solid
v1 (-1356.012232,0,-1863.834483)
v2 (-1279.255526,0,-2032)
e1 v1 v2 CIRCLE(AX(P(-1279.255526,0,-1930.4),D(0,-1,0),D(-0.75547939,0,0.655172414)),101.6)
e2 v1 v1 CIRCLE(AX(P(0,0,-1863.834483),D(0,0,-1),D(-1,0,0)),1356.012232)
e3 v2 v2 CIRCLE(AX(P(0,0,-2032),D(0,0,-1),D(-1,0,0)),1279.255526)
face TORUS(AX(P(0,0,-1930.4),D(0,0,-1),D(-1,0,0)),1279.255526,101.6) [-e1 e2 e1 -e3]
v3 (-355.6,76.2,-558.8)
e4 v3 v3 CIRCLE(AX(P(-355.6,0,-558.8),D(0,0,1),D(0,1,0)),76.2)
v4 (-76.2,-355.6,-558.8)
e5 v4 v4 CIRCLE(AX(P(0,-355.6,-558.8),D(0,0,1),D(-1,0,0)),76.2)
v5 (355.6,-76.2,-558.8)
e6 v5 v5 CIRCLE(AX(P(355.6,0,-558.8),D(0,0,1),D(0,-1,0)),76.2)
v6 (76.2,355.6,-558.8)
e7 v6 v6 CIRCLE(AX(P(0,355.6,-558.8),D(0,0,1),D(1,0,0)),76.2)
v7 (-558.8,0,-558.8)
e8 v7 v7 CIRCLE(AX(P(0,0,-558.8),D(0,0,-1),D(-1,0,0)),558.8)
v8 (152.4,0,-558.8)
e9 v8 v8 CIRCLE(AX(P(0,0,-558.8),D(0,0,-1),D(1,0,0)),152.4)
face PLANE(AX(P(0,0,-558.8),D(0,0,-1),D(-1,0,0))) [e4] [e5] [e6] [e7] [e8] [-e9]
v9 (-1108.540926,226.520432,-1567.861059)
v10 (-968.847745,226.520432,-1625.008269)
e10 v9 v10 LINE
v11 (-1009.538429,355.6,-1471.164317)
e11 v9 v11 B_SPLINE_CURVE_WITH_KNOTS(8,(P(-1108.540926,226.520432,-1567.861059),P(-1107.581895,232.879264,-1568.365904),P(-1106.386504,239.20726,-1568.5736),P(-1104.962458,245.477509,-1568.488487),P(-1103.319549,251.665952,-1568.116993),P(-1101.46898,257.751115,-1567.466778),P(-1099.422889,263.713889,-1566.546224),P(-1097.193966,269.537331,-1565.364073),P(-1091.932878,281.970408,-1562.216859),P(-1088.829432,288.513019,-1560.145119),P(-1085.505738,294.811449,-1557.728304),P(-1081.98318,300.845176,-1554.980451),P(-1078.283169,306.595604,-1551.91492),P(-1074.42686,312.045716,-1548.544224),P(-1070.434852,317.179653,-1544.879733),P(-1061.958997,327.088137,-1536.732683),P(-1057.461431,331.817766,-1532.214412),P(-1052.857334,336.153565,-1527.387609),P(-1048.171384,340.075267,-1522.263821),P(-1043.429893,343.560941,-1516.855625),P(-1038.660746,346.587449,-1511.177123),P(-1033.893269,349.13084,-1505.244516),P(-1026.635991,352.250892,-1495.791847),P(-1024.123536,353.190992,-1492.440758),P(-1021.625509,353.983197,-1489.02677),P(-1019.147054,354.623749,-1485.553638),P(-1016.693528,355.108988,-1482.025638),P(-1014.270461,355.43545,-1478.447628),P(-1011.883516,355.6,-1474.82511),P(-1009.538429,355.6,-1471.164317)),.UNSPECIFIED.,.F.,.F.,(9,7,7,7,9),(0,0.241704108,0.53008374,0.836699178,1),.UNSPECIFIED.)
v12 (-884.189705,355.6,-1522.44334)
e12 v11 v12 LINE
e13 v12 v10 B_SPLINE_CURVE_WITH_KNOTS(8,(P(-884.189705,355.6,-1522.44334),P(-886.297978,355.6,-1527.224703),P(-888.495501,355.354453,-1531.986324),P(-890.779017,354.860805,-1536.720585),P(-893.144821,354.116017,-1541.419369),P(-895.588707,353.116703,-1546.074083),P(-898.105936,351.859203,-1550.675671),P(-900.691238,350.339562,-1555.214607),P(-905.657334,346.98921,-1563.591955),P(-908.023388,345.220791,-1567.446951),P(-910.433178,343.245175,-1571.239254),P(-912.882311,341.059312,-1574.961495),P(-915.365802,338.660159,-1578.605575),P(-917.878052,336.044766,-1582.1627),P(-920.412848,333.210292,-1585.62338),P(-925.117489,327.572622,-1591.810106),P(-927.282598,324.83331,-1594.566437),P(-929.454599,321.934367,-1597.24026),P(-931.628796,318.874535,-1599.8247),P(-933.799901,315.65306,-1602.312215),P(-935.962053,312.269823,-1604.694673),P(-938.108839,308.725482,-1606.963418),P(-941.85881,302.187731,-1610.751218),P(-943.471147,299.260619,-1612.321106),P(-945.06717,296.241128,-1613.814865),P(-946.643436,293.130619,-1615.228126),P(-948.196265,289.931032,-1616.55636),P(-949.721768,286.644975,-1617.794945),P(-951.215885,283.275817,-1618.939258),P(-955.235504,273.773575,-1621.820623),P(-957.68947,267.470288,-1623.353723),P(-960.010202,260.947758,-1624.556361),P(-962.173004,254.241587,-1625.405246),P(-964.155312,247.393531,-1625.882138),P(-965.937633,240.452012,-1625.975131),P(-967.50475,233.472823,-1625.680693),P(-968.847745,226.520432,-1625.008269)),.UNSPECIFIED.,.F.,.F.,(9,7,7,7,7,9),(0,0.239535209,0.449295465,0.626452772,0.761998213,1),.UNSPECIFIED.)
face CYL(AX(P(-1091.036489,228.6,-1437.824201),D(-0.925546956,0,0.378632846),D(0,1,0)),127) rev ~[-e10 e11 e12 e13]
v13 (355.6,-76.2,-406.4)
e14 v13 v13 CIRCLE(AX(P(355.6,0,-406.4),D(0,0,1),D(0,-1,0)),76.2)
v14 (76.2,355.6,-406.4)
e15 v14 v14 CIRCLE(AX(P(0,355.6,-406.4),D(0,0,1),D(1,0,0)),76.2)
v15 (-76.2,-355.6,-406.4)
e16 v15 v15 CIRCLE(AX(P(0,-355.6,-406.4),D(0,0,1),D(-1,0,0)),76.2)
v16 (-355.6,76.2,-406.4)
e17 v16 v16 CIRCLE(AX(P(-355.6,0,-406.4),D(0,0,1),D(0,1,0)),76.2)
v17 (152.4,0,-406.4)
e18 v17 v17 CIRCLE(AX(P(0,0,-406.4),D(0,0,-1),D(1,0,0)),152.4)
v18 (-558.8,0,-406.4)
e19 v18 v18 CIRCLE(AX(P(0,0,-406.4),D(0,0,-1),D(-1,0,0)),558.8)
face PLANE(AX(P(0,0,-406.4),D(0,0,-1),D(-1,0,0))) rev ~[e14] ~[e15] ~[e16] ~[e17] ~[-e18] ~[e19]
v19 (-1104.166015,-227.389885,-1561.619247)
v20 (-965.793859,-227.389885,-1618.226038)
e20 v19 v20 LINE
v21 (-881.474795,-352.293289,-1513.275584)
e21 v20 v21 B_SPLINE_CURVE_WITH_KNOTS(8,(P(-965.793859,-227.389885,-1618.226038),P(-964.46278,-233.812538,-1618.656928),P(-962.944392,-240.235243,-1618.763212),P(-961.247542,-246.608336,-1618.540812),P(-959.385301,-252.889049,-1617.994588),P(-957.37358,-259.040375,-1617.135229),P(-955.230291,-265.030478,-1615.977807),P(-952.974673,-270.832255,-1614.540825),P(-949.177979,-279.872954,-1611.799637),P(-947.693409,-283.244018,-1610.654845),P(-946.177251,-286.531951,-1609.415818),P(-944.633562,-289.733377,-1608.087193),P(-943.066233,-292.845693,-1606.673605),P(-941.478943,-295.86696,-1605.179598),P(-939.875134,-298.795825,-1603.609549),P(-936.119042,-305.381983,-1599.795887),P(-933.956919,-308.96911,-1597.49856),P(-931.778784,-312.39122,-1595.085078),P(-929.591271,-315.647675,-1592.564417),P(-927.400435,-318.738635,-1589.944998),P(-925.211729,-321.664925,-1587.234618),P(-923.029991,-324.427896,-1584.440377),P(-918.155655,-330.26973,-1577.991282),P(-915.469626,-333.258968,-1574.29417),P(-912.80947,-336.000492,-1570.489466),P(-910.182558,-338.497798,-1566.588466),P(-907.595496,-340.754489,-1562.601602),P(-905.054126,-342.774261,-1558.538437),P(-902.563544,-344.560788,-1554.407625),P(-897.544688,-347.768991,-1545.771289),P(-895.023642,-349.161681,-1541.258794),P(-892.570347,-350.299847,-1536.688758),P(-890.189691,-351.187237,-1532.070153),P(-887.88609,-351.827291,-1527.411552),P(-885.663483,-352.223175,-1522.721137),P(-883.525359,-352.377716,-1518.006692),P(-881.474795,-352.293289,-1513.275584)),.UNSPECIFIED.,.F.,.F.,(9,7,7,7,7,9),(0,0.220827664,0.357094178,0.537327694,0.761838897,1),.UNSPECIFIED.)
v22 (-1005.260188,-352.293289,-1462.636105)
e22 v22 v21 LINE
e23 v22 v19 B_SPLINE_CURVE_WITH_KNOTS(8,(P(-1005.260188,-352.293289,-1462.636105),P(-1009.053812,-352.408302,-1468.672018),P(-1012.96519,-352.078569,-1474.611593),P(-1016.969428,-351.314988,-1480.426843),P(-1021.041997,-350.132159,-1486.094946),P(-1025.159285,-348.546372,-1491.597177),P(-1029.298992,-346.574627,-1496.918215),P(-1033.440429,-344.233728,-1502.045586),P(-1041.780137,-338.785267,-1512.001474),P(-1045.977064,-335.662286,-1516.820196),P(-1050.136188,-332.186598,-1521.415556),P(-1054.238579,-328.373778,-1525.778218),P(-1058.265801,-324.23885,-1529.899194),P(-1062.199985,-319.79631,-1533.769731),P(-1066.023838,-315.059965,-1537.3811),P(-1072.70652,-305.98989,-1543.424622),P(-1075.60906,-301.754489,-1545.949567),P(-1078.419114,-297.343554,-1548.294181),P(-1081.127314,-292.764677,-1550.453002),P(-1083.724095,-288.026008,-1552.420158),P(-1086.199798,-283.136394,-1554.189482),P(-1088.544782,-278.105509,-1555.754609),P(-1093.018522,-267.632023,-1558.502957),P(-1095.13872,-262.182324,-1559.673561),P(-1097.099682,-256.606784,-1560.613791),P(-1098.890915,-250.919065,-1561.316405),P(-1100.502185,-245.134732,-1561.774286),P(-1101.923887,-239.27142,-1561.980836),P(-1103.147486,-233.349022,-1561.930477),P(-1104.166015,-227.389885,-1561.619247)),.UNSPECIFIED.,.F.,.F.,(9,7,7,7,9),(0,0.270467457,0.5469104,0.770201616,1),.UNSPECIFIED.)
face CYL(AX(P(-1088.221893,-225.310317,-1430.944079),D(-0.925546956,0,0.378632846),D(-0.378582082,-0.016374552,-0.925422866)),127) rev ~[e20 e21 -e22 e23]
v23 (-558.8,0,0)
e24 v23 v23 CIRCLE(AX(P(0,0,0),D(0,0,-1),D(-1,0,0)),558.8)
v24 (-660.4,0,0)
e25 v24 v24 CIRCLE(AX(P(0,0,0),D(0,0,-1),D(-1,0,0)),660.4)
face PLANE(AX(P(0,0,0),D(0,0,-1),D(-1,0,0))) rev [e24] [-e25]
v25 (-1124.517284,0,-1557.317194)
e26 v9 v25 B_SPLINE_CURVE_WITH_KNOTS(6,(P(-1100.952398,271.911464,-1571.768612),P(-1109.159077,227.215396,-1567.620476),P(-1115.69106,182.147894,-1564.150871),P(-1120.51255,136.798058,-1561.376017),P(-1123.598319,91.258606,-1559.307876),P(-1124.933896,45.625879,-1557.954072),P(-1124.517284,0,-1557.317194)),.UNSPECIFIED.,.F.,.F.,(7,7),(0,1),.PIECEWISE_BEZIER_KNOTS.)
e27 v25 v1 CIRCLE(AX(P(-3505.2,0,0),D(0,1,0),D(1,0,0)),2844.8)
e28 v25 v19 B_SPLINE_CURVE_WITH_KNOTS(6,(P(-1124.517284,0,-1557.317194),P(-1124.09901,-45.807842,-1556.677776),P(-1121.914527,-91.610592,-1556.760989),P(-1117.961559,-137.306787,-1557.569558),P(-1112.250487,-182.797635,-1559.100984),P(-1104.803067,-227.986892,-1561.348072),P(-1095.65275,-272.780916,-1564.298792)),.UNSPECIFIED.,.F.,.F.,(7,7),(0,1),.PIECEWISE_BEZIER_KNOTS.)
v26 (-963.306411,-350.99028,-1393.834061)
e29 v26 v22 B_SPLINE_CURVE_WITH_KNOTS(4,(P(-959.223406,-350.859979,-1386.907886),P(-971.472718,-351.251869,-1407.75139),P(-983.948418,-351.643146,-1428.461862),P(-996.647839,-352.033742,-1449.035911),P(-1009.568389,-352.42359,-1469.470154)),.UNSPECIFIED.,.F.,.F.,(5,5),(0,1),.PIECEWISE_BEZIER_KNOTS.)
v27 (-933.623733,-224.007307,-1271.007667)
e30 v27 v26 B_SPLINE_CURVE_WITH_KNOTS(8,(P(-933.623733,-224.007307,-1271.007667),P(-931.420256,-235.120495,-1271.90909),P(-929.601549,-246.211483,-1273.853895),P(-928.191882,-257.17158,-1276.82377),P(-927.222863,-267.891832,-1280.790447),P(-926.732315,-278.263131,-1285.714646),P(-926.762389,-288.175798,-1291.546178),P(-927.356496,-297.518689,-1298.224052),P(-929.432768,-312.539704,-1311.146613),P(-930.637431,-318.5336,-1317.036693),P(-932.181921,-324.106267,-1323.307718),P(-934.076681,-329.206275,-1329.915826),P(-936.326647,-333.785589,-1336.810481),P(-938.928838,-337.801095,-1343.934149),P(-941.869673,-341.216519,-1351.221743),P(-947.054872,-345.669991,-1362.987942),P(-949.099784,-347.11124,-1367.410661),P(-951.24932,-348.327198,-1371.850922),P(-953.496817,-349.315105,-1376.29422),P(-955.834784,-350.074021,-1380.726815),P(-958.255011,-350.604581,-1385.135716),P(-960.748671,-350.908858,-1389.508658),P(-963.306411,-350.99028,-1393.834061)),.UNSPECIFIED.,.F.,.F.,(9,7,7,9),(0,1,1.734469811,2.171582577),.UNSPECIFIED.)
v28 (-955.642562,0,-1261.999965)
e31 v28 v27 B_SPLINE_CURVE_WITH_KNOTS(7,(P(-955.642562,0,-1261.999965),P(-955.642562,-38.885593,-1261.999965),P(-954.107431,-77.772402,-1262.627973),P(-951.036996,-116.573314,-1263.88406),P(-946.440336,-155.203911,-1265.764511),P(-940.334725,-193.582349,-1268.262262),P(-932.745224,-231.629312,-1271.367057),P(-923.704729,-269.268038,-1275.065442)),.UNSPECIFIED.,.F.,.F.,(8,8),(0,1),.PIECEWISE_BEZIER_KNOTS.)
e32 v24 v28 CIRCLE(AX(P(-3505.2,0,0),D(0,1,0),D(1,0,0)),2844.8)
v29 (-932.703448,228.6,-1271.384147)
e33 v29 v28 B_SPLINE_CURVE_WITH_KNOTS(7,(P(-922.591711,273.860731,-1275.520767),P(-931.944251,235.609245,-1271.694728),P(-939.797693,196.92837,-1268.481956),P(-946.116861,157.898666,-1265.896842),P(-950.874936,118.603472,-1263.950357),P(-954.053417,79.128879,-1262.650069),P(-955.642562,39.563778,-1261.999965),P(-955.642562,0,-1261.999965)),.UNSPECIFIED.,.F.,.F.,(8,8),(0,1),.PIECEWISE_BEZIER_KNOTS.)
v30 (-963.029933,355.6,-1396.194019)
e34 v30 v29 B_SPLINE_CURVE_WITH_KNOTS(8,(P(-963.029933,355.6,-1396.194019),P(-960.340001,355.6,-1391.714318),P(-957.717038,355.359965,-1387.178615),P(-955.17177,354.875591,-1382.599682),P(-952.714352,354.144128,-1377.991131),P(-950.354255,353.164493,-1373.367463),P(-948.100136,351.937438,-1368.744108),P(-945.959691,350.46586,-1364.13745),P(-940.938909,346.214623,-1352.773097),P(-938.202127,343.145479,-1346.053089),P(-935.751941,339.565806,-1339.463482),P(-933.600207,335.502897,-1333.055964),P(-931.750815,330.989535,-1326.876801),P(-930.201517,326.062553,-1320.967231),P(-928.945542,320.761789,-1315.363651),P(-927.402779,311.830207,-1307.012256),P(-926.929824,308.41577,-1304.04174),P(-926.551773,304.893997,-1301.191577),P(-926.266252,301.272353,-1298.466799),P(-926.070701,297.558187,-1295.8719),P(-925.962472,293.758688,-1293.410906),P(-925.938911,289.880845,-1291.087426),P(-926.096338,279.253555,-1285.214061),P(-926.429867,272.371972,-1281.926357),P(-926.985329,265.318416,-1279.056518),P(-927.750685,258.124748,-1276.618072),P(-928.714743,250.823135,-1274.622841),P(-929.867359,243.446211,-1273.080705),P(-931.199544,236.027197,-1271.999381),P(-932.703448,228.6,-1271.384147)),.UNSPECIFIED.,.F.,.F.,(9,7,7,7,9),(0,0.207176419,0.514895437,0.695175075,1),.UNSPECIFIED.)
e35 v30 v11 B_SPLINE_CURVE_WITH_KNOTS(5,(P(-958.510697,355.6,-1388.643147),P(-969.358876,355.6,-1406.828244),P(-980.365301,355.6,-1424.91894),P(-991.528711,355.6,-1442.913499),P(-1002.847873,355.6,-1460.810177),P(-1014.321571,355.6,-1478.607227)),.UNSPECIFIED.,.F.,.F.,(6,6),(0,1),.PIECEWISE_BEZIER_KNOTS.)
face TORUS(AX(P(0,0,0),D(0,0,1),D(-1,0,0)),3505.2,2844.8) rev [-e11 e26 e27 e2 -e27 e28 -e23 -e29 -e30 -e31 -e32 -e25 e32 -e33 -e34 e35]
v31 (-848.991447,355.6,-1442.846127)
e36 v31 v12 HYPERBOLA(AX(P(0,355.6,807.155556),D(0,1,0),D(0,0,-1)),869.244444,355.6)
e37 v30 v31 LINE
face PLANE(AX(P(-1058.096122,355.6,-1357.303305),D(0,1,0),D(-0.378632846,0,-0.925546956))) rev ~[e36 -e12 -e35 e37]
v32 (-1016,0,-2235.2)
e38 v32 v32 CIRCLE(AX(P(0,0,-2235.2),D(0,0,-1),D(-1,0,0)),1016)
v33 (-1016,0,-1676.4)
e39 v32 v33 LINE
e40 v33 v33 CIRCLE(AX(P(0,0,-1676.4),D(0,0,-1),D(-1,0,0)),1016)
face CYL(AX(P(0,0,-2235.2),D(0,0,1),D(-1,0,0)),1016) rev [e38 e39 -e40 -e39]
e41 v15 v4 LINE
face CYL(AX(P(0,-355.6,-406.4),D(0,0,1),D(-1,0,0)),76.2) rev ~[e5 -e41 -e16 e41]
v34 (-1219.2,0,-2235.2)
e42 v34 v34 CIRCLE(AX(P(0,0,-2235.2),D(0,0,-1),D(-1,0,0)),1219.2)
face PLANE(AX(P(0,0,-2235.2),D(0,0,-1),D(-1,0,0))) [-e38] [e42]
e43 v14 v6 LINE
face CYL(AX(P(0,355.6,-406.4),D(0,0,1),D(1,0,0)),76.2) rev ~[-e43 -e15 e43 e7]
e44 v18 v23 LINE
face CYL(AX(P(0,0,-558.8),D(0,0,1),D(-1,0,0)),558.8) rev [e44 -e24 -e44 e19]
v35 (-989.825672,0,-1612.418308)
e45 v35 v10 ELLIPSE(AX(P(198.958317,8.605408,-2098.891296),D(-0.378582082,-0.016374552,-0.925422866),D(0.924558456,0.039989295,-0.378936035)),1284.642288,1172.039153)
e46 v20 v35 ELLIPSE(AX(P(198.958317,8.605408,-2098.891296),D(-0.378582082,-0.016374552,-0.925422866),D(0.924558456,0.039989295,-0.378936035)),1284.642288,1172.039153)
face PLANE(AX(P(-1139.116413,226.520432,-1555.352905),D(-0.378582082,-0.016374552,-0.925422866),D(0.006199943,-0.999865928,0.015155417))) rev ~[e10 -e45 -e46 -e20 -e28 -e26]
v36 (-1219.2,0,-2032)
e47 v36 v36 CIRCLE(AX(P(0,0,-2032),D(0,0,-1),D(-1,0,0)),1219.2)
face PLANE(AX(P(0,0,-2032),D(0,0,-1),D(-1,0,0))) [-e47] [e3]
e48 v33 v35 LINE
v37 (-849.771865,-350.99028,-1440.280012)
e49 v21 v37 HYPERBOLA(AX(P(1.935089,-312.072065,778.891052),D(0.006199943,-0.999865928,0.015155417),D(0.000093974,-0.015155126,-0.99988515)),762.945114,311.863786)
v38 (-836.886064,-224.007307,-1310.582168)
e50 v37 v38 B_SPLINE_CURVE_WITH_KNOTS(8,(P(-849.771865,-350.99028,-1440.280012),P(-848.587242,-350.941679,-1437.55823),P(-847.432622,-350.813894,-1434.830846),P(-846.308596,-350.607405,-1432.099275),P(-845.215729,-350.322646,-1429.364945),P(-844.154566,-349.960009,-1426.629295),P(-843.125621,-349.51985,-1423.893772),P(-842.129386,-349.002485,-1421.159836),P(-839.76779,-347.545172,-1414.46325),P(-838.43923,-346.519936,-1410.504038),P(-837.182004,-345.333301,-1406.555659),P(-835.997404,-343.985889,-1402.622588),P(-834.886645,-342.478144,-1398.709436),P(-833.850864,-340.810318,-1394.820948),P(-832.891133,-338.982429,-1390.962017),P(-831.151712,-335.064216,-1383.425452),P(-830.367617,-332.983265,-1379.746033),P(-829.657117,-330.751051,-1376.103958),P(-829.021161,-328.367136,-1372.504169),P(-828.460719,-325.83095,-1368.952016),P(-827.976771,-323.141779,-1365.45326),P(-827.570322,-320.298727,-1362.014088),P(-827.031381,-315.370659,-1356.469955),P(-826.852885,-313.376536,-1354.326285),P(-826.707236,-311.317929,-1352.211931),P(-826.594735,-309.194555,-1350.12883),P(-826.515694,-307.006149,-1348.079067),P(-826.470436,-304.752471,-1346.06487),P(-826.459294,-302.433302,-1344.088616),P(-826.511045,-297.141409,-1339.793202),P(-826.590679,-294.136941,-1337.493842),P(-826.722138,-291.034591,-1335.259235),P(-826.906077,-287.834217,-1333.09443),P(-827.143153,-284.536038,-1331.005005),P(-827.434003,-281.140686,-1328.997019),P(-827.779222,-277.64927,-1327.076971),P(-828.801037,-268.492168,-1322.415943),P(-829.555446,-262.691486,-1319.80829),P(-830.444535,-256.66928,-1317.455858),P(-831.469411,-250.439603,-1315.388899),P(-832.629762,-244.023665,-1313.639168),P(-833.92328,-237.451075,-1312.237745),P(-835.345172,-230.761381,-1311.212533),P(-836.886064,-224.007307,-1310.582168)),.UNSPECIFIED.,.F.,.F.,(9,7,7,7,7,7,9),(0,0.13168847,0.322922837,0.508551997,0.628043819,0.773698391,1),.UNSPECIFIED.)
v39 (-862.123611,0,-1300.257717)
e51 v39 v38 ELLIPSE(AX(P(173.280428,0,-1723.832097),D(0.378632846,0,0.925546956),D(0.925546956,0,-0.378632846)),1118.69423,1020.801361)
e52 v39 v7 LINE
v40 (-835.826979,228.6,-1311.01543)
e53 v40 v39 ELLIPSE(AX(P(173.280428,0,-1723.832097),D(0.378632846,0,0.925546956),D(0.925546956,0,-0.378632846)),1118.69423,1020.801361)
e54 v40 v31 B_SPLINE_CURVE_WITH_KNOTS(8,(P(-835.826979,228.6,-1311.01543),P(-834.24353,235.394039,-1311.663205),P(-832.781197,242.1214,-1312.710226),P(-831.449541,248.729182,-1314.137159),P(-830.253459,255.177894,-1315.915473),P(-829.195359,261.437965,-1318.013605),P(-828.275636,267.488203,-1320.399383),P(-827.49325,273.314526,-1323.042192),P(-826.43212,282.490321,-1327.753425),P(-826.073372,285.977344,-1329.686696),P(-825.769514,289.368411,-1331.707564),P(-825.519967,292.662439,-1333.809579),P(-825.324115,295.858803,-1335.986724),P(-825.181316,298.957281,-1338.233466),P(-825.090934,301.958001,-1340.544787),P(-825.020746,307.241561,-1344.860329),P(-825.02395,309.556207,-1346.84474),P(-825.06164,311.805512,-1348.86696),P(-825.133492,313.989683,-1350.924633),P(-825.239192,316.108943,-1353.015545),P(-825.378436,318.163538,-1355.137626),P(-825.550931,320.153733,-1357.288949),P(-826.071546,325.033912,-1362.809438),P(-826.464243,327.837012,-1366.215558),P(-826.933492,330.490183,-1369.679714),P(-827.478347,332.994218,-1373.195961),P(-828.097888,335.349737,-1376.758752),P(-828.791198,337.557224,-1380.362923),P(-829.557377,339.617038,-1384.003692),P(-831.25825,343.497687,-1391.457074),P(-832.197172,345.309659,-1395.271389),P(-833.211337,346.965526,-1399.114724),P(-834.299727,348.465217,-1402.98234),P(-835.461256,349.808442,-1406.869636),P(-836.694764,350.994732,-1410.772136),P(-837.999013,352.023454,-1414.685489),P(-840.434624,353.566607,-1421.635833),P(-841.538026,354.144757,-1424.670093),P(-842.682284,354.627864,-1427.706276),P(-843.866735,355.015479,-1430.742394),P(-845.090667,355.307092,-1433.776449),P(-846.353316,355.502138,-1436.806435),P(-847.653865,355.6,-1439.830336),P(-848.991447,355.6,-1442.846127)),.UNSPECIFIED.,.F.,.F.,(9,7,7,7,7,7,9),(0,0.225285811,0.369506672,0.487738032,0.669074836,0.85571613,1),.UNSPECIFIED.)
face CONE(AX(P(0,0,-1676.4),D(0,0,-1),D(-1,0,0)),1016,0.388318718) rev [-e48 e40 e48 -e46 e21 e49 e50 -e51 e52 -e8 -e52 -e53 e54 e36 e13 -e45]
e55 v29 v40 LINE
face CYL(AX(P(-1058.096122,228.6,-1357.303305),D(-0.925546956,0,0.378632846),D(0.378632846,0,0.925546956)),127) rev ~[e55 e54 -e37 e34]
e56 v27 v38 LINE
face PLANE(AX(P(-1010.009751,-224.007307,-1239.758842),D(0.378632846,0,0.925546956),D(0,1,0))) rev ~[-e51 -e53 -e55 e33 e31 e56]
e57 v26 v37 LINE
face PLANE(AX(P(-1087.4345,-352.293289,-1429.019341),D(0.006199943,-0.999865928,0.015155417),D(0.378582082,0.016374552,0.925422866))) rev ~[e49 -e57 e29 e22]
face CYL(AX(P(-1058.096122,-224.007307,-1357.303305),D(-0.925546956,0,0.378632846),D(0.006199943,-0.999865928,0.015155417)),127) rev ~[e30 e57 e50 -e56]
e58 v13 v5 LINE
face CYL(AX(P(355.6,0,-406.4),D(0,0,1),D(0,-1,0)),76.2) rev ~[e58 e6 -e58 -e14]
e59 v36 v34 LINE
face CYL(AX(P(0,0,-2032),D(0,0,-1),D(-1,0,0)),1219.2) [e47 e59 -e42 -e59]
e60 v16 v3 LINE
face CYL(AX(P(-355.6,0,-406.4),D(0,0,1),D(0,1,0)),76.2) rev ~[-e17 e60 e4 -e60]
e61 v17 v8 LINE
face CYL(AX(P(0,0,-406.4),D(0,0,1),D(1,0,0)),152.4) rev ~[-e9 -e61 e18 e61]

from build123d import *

# Parameters (mm, degrees)
F0_W            = 558.8
F0_H            = 152.4
F2_R            = 152.4
F2_R_2          = 76.2
F3_DEPTH        = 152.4
F3_COPIES_COUNT = 4
F6_DEPTH        = 254


# Not quite as in the source:
# - a pattern or mirror of a feature is missing from the dataset's text; its kind, count and spacing are read off the source's solid


with BuildPart() as f1:
    # F0 (on Front) → F1 (revolve)
    with BuildSketch(Plane.XZ):
        with BuildLine():
            Line((-558.8, -406.4), (-558.8, 0))
            Line((-558.8, 0), (-660.4, 0))
            ThreePointArc((-660.4, 0), (-789.186679788, -846.2615933806), (-1163.8861392232, -1615.9011248632))
            Line((-1163.8861392232, -1615.9011248632), (-1016, -1676.4))
            Line((-1016, -1676.4), (-558.8, -558.8))
            Line((-558.8, -558.8), (-558.8, -406.4))
        make_face()
        with Locations((-279.4, -482.6)):
            Rectangle(F0_W, F0_H)
        with BuildLine():
            Line((-1016, -1676.4), (-1163.8861392232, -1615.9011248632))
            ThreePointArc((-1163.8861392232, -1615.9011248632), (-1256.5295136119, -1742.5177427065), (-1356.0122322887, -1863.8344827586))
            ThreePointArc((-1356.0122322887, -1863.8344827586), (-1371.6828397721, -1972.5871037657), (-1279.255526299, -2032))
            Line((-1279.255526299, -2032), (-1219.2, -2032))
            Line((-1219.2, -2032), (-1219.2, -2235.2))
            Line((-1219.2, -2235.2), (-1016, -2235.2))
            Line((-1016, -2235.2), (-1016, -1676.4))
        make_face()
    revolve(axis=Axis((0, 0, -482.6), (0, 0, -1)))

    # F2 (on face) → F3 (cut)
    with BuildSketch(Plane.XY.offset(-406.4)):
        Circle(F2_R)
        with Locations((0, 355.6)):
            Circle(F2_R_2)
    f3 = extrude(amount=-F3_DEPTH, mode=Mode.SUBTRACT)

    # F3_copies: F3 ×4 about axis
    f3_copies_axis = Axis((0, 0, 0), (0, 0, 1))
    for i in range(1, F3_COPIES_COUNT):
        add(f3.rotate(f3_copies_axis, i * 360 / F3_COPIES_COUNT), mode=Mode.SUBTRACT)

    # F5 (on line) → F6 (cut)
    with BuildSketch(Plane(origin=(-430.7477321435, 0, 176.2149813314), x_dir=(0, -1, 0), z_dir=(-0.9255469562, 0, 0.3786328457))):
        with BuildLine():
            Line((224.0073072261, -1529.8778886352), (0, -1529.8778886352))
            Line((0, -1529.8778886352), (-228.6, -1529.8778886352))
            ThreePointArc((-228.6, -1529.8778886352), (-318.4025612107, -1567.0753274245), (-355.6, -1656.8778886352))
            Line((-355.6, -1656.8778886352), (-355.6, -1743.8760634962))
            ThreePointArc((-355.6, -1743.8760634962), (-317.664288151, -1834.4108776627), (-226.5204318715, -1870.8590363563))
            Line((-226.5204318715, -1870.8590363563), (0, -1867.1493683594))
            Line((0, -1867.1493683594), (227.3898847479, -1863.4254615519))
            ThreePointArc((227.3898847479, -1863.4254615519), (316.5713145497, -1824.7625331708), (352.2932894796, -1734.3629205632))
            Line((352.2932894796, -1734.3629205632), (350.9902800862, -1654.7983205067))
            ThreePointArc((350.9902800862, -1654.7983205067), (313.071595377, -1566.3430744687), (224.0073072261, -1529.8778886352))
        make_face()
    extrude(amount=-F6_DEPTH, mode=Mode.SUBTRACT)


solid = f1.part
